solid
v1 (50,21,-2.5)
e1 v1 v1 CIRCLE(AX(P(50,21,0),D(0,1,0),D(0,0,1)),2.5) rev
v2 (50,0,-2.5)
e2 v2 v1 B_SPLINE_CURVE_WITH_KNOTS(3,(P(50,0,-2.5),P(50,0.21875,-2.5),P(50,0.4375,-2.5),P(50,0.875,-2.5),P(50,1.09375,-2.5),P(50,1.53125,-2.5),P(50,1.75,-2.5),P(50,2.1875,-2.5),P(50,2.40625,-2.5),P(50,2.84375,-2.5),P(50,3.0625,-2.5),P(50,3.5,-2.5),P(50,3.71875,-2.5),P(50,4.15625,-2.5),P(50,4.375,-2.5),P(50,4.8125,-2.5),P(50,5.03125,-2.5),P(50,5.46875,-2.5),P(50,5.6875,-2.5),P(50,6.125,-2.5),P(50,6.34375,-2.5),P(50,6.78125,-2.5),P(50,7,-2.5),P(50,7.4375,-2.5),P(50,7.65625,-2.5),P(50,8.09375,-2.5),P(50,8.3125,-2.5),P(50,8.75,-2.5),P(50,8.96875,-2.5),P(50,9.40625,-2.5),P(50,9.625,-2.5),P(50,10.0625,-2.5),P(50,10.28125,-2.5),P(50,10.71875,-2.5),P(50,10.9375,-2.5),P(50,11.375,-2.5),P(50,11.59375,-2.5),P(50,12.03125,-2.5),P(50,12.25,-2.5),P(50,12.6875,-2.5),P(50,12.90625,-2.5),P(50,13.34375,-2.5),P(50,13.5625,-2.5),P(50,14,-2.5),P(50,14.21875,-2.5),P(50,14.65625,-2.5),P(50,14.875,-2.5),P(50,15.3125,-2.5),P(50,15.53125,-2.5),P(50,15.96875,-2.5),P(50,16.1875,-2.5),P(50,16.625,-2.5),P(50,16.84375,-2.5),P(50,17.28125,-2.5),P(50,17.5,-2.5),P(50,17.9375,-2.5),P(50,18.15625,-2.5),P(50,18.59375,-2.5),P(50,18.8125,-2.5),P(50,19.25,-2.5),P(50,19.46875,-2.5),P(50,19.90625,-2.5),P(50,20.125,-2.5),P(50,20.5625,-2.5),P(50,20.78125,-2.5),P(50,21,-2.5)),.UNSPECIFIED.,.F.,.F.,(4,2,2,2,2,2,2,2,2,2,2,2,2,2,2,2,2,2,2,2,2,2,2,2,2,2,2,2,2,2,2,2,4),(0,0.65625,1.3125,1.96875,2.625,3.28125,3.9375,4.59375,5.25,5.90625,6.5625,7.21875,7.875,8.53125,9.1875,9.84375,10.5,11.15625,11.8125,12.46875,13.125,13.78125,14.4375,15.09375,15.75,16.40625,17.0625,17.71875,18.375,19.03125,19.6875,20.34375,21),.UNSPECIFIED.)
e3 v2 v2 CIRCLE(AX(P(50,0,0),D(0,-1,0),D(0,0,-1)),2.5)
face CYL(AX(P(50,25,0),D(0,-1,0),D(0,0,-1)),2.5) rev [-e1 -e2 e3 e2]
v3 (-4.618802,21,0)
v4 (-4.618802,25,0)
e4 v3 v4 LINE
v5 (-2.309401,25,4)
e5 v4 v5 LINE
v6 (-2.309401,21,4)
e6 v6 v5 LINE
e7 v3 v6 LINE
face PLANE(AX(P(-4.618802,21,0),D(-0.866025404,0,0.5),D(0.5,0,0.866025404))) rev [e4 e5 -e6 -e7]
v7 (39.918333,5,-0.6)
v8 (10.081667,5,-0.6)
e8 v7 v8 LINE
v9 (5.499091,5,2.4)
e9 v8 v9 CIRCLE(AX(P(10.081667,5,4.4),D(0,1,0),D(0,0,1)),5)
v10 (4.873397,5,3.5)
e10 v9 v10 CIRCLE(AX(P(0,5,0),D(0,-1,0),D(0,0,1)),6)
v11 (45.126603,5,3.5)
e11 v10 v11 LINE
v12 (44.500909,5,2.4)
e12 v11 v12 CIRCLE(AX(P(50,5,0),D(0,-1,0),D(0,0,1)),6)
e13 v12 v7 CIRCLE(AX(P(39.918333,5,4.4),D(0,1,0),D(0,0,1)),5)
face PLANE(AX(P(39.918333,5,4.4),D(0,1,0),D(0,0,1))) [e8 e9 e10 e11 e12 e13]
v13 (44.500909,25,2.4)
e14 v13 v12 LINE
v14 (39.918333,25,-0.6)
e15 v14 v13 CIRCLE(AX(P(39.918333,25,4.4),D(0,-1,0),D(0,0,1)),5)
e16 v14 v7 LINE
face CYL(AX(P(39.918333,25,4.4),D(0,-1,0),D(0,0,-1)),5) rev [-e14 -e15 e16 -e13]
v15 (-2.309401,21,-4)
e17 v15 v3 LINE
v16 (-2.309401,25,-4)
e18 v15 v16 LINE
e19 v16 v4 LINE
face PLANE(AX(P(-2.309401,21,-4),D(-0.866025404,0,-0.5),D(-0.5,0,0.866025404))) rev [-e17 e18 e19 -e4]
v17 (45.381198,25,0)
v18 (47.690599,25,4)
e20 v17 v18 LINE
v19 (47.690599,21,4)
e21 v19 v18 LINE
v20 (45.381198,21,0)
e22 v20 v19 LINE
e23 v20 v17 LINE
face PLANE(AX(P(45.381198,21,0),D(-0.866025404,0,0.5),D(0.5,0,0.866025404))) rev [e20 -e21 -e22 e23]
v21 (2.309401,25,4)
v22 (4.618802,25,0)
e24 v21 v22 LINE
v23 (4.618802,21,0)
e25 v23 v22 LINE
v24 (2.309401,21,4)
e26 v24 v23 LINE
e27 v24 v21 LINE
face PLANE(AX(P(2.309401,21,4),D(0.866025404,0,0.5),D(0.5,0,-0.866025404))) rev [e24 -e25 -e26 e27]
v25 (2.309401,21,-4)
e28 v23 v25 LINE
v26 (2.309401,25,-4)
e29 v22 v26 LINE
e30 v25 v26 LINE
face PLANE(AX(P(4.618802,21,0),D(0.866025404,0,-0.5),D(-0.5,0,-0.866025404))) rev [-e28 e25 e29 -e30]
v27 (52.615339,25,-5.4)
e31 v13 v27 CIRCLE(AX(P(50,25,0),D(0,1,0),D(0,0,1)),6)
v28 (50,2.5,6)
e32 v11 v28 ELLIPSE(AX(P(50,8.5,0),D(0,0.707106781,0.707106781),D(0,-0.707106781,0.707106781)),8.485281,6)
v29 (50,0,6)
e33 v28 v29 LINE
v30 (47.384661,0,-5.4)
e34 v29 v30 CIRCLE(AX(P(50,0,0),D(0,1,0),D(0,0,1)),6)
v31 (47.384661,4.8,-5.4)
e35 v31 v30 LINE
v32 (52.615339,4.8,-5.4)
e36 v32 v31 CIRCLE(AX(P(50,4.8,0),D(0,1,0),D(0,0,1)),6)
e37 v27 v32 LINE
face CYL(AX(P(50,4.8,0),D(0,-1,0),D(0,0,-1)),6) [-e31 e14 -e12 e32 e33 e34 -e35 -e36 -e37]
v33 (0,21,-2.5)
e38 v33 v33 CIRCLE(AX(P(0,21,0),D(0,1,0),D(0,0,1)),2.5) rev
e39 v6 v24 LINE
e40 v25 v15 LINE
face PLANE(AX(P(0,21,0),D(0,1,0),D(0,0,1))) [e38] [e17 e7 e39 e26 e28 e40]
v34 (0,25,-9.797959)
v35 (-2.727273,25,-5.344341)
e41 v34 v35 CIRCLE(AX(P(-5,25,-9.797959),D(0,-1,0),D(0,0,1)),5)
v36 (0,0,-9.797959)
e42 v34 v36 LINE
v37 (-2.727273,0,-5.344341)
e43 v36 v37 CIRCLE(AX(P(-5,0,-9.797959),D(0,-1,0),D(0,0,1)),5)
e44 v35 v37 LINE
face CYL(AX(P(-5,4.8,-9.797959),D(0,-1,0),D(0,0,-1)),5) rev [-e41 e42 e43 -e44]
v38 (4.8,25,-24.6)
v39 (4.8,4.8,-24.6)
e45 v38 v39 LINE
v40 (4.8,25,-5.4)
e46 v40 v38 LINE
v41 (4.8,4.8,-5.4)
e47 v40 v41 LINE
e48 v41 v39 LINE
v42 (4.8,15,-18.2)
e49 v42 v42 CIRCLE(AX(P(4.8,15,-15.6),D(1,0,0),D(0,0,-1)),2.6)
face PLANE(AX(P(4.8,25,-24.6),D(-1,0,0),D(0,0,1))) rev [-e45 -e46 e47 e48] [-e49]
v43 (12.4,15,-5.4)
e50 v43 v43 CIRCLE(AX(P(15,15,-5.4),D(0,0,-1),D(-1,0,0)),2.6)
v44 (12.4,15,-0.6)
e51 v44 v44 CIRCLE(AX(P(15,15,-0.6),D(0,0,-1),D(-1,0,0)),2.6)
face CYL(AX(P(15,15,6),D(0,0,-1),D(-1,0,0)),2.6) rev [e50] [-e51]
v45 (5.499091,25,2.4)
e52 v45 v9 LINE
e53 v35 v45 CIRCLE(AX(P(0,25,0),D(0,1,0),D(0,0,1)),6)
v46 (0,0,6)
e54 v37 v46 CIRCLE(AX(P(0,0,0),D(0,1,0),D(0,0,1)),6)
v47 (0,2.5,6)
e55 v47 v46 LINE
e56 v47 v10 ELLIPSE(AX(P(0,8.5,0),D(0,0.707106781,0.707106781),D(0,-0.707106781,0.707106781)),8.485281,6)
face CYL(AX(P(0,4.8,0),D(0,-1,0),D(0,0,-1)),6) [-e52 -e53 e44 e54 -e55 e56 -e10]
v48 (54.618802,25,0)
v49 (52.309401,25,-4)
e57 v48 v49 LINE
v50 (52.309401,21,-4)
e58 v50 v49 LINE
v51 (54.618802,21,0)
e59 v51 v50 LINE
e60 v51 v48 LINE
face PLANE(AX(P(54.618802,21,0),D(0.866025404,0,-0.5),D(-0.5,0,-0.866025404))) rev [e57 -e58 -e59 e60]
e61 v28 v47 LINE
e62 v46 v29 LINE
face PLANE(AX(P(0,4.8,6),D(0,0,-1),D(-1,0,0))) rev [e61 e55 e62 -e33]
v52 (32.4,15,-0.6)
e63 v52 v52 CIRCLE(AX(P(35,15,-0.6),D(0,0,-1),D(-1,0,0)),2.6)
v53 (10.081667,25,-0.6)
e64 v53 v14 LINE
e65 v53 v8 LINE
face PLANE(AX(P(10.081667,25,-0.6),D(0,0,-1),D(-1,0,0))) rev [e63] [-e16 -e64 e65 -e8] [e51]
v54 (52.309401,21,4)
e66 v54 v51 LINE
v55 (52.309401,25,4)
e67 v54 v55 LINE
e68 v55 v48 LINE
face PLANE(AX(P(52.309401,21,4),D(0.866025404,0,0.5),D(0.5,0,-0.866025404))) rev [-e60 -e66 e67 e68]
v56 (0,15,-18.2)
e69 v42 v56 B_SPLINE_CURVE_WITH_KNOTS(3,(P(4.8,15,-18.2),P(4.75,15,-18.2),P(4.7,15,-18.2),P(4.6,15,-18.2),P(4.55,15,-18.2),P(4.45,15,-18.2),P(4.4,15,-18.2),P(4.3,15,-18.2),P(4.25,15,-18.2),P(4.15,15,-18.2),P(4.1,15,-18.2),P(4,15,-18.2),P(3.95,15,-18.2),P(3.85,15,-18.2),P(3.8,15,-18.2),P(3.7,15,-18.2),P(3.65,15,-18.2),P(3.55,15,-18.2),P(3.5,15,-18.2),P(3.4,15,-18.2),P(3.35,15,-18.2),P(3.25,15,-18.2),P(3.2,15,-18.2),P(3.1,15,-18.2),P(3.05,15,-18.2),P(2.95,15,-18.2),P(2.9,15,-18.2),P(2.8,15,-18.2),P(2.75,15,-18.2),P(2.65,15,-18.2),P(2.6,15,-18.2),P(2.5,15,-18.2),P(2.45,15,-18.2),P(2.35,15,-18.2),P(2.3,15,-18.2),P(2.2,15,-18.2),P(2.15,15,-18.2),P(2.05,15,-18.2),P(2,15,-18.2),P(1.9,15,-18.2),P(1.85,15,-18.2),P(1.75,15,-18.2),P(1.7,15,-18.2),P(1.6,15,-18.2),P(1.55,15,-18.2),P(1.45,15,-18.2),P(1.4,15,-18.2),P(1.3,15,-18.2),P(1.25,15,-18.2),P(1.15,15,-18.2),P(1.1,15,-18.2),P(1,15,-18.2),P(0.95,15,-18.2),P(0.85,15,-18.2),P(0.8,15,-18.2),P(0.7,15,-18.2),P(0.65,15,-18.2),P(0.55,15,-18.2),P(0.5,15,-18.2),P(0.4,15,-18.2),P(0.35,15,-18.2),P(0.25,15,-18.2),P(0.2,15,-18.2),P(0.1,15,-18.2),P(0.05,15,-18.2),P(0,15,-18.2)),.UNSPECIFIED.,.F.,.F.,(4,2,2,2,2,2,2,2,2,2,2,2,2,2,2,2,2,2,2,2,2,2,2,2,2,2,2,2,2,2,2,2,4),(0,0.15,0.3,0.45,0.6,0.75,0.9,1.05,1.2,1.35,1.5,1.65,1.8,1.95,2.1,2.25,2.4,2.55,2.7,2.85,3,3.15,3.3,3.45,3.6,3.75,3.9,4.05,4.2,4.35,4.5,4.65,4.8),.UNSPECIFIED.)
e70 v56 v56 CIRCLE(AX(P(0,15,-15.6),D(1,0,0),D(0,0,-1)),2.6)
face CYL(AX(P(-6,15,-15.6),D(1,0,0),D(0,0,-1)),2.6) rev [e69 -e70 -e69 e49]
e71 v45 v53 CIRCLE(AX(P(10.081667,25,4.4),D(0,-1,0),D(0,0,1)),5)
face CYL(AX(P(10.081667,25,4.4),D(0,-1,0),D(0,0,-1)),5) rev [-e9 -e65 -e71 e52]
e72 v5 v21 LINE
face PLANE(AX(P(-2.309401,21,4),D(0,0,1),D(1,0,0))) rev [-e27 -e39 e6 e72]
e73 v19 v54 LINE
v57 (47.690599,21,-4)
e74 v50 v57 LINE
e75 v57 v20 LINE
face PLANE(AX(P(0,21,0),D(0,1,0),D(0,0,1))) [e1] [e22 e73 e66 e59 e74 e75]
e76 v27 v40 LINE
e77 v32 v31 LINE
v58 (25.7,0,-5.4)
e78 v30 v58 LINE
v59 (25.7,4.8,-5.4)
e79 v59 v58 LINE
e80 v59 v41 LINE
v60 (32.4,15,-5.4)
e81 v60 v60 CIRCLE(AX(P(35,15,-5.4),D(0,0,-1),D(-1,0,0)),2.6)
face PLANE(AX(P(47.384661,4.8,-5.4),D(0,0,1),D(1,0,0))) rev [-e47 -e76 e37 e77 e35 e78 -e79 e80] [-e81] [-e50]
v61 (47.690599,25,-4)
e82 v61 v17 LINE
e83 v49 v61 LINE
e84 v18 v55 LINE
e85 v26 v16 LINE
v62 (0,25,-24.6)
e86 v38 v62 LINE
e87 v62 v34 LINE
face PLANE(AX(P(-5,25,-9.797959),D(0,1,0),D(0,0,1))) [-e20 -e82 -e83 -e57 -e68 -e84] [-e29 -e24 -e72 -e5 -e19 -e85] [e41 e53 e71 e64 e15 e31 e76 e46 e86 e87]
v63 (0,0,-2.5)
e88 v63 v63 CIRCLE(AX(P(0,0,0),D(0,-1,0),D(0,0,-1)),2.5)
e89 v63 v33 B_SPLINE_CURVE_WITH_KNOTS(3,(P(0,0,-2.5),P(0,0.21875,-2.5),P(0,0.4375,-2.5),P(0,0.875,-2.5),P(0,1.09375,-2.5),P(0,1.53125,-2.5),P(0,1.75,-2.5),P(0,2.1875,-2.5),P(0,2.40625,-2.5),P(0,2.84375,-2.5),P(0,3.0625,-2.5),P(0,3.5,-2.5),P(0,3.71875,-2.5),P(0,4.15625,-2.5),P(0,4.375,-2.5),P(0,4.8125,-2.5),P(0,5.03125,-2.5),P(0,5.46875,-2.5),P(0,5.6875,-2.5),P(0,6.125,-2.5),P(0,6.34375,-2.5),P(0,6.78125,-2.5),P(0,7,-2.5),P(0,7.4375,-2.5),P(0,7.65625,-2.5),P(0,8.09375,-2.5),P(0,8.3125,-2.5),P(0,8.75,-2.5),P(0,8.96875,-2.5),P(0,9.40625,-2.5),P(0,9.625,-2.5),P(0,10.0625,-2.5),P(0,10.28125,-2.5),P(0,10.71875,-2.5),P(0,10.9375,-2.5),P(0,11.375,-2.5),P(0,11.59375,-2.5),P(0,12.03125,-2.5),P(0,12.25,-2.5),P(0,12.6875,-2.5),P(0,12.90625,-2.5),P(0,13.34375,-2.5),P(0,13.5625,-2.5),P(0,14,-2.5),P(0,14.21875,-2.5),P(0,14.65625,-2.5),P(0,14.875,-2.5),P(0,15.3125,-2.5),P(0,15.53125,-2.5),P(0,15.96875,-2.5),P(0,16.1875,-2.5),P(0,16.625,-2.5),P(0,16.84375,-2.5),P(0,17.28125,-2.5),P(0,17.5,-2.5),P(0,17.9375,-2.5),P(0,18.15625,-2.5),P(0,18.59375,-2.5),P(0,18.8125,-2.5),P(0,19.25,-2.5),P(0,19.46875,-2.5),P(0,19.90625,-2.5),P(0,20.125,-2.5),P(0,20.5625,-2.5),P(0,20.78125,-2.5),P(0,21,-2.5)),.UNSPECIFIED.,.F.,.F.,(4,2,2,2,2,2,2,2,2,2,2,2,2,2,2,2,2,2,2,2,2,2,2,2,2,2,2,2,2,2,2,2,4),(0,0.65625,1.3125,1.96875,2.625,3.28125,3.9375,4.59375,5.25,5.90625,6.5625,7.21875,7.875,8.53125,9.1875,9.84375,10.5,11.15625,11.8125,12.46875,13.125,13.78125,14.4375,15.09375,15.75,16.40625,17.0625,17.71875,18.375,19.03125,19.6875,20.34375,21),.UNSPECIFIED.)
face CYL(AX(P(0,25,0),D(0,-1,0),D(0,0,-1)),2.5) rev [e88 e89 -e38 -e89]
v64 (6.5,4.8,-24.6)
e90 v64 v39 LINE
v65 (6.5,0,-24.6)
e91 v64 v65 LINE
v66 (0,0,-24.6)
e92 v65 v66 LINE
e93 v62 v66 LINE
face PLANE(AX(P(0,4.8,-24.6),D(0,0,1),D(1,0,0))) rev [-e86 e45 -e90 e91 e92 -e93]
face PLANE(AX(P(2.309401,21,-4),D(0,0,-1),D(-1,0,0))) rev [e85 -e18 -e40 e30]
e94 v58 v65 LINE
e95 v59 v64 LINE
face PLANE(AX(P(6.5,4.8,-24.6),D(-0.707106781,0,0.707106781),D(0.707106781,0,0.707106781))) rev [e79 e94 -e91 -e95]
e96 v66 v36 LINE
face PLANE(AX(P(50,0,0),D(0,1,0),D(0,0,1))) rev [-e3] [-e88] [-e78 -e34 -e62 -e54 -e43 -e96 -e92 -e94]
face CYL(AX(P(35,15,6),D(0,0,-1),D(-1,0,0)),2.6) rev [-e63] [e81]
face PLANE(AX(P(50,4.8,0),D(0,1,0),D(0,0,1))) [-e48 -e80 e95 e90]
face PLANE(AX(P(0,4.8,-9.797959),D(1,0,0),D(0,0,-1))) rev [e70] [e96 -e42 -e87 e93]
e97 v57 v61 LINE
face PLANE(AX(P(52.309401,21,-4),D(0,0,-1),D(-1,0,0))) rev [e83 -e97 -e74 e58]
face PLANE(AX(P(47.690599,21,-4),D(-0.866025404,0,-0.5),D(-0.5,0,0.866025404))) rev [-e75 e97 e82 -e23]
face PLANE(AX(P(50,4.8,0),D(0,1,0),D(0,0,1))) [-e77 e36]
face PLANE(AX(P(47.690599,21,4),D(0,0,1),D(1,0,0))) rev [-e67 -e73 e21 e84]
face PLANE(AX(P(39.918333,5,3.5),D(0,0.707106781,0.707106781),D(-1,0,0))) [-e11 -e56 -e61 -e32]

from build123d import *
from build123d.topology import SkipClean

# Parameters (mm, degrees)
BOSS_EXTRUDE1_DEPTH = 4.8
BOSS_EXTRUDE2_DEPTH = 20.2
BOSS_EXTRUDE3_DEPTH = 0.2
CHAMFER1_SIZE       = 2.5
SKETCH4_R           = 2.5
CUT_EXTRUDE1_DEPTH  = 67.076924868
CUT_EXTRUDE2_DEPTH  = 4
SKETCH6_R           = 2.6
CUT_EXTRUDE3_DEPTH  = 65.262275092
SKETCH7_R           = 2.6
CUT_EXTRUDE4_DEPTH  = 63.061260058


with BuildPart() as part:
    # Sketch1 → Boss-Extrude1 (new body)
    with BuildSketch(Plane(origin=(0, 0, 0), x_dir=(1, 0, 0), z_dir=(0, 1, 0))):
        with BuildLine():
            Line((0, -6), (50, -6))
            ThreePointArc((50, -6), (55.848076607, 1.341640786), (47.384660634, 5.4))
            Line((47.384660634, 5.4), (25.7, 5.4))
            Line((25.7, 5.4), (6.5, 24.6))
            Line((6.5, 24.6), (0, 24.6))
            Line((0, 24.6), (0, 9.797958971))
            ThreePointArc((0, 9.797958971), (-0.735985673, 7.186794132), (-2.727272727, 5.344341257))
            ThreePointArc((-2.727272727, 5.344341257), (-5.833782973, -1.402489297), (0, -6))
        make_face()
    extrude(amount=BOSS_EXTRUDE1_DEPTH)

    # Sketch2 → Boss-Extrude2 (add)
    with SkipClean():  # the faces are left unmerged after this step: merging them gives an invalid solid
        with BuildSketch(Plane(origin=(0, 4.8, 0), x_dir=(1, 0, 0), z_dir=(0, 1, 0))):
            with BuildLine():
                Line((0, 24.6), (4.8, 24.6))
                Line((4.8, 24.6), (4.8, 5.4))
                Line((4.8, 5.4), (52.615339366, 5.4))
                ThreePointArc((52.615339366, 5.4), (54.158005006, -4.325620692), (44.500909166, -2.4))
                ThreePointArc((44.500909166, -2.4), (42.656946259, -0.216699867), (39.918333471, 0.6))
                Line((39.918333471, 0.6), (10.081666529, 0.6))
                ThreePointArc((10.081666529, 0.6), (7.343053741, -0.216699867), (5.499090834, -2.4))
                ThreePointArc((5.499090834, -2.4), (-4.112717992, -4.368701262), (-2.727272727, 5.344341257))
                ThreePointArc((-2.727272727, 5.344341257), (-0.735985673, 7.186794132), (0, 9.797958971))
                Line((0, 9.797958971), (0, 24.6))
            make_face()
        extrude(amount=BOSS_EXTRUDE2_DEPTH)

    # Sketch3 → Boss-Extrude3 (add)
    with SkipClean():  # the faces are left unmerged after this step: merging them gives an invalid solid
        with BuildSketch(Plane(origin=(0, 4.8, 0), x_dir=(1, 0, 0), z_dir=(0, 1, 0))):
            with BuildLine():
                Line((39.918333471, 0.6), (10.081666529, 0.6))
                ThreePointArc((10.081666529, 0.6), (7.343053741, -0.216699867), (5.499090834, -2.4))
                ThreePointArc((5.499090834, -2.4), (3.286335345, -5.019960159), (0, -6))
                Line((0, -6), (50, -6))
                ThreePointArc((50, -6), (46.713664655, -5.019960159), (44.500909166, -2.4))
                ThreePointArc((44.500909166, -2.4), (42.656946259, -0.216699867), (39.918333471, 0.6))
            make_face()
        extrude(amount=BOSS_EXTRUDE3_DEPTH)

    # Chamfer1
    # the kernel refuses this chamfer: 2.5 mm, written as the material it takes off along each edge
    with BuildSketch(Plane(origin=(-6.42920747, 5, 6), x_dir=(0, -0.9996219169112968, 0.027495876610586317), z_dir=(1, 0, 0))) as chamfer1_piece_1_section:
        Polygon((CHAMFER1_SIZE * 0.999621916911, CHAMFER1_SIZE * 0.0274958766106), (-CHAMFER1_SIZE * 0.0274958766106, CHAMFER1_SIZE * 0.999621916911), (0, 0), align=None)
    chamfer1_piece_1 = extrude(amount=62.85841494, mode=Mode.PRIVATE)
    chamfer1_piece_1 = chamfer1_piece_1 - Plane(origin=(0, 4.144274293, 0), x_dir=(0.9165151389911681, 0, 0.3999999999999999), z_dir=(0, -1, 0)) * Cylinder(6, 136, mode=Mode.PRIVATE)
    chamfer1_piece_1 = chamfer1_piece_1 - Plane(origin=(50, 4.144274293, 0), x_dir=(0.43588989435406716, 0, -0.9000000000000001), z_dir=(0, -1, 0)) * Cylinder(6, 136, mode=Mode.PRIVATE)
    add(chamfer1_piece_1, mode=Mode.SUBTRACT)

    # Sketch4 → Cut-Extrude1 (cut, through all)
    with BuildSketch(Plane.XZ):
        with Locations(Location((0, 0, 0), (0, 0, 270))):
            Circle(SKETCH4_R)
        with Locations(Location((50, 0, 0), (0, 0, 270))):
            Circle(SKETCH4_R)
    extrude(amount=-CUT_EXTRUDE1_DEPTH, mode=Mode.SUBTRACT)

    # Sketch5 → Cut-Extrude2 (cut)
    with BuildSketch(Plane(origin=(0, 25, 0), x_dir=(1, 0, 0), z_dir=(0, 1, 0))):
        Polygon((4.618802154, 0), (2.309401077, 4), (-2.309401077, 4), (-4.618802154, 0), (-2.309401077, -4), (2.309401077, -4), align=None)
        Polygon((47.690598923, 4), (45.381197846, 0), (47.690598923, -4), (52.309401077, -4), (54.618802154, 0), (52.309401077, 4), align=None)
    extrude(amount=-CUT_EXTRUDE2_DEPTH, mode=Mode.SUBTRACT)

    # Sketch6 → Cut-Extrude3 (cut, through all)
    with BuildSketch(Plane(origin=(0, 0, -5.4), x_dir=(-1, 0, 0), z_dir=(0, 0, -1))):
        with Locations((-35, 15)):
            Circle(SKETCH6_R)
        with Locations((-15, 15)):
            Circle(SKETCH6_R)
    extrude(amount=-CUT_EXTRUDE3_DEPTH, mode=Mode.SUBTRACT)

    # Sketch7 → Cut-Extrude4 (cut, through all)
    with BuildSketch(Plane(origin=(4.8, 0, 0), x_dir=(0, 0, -1), z_dir=(1, 0, 0))):
        with Locations((15.6, 15)):
            Circle(SKETCH7_R)
    extrude(amount=-CUT_EXTRUDE4_DEPTH, mode=Mode.SUBTRACT)


solid = part.part
